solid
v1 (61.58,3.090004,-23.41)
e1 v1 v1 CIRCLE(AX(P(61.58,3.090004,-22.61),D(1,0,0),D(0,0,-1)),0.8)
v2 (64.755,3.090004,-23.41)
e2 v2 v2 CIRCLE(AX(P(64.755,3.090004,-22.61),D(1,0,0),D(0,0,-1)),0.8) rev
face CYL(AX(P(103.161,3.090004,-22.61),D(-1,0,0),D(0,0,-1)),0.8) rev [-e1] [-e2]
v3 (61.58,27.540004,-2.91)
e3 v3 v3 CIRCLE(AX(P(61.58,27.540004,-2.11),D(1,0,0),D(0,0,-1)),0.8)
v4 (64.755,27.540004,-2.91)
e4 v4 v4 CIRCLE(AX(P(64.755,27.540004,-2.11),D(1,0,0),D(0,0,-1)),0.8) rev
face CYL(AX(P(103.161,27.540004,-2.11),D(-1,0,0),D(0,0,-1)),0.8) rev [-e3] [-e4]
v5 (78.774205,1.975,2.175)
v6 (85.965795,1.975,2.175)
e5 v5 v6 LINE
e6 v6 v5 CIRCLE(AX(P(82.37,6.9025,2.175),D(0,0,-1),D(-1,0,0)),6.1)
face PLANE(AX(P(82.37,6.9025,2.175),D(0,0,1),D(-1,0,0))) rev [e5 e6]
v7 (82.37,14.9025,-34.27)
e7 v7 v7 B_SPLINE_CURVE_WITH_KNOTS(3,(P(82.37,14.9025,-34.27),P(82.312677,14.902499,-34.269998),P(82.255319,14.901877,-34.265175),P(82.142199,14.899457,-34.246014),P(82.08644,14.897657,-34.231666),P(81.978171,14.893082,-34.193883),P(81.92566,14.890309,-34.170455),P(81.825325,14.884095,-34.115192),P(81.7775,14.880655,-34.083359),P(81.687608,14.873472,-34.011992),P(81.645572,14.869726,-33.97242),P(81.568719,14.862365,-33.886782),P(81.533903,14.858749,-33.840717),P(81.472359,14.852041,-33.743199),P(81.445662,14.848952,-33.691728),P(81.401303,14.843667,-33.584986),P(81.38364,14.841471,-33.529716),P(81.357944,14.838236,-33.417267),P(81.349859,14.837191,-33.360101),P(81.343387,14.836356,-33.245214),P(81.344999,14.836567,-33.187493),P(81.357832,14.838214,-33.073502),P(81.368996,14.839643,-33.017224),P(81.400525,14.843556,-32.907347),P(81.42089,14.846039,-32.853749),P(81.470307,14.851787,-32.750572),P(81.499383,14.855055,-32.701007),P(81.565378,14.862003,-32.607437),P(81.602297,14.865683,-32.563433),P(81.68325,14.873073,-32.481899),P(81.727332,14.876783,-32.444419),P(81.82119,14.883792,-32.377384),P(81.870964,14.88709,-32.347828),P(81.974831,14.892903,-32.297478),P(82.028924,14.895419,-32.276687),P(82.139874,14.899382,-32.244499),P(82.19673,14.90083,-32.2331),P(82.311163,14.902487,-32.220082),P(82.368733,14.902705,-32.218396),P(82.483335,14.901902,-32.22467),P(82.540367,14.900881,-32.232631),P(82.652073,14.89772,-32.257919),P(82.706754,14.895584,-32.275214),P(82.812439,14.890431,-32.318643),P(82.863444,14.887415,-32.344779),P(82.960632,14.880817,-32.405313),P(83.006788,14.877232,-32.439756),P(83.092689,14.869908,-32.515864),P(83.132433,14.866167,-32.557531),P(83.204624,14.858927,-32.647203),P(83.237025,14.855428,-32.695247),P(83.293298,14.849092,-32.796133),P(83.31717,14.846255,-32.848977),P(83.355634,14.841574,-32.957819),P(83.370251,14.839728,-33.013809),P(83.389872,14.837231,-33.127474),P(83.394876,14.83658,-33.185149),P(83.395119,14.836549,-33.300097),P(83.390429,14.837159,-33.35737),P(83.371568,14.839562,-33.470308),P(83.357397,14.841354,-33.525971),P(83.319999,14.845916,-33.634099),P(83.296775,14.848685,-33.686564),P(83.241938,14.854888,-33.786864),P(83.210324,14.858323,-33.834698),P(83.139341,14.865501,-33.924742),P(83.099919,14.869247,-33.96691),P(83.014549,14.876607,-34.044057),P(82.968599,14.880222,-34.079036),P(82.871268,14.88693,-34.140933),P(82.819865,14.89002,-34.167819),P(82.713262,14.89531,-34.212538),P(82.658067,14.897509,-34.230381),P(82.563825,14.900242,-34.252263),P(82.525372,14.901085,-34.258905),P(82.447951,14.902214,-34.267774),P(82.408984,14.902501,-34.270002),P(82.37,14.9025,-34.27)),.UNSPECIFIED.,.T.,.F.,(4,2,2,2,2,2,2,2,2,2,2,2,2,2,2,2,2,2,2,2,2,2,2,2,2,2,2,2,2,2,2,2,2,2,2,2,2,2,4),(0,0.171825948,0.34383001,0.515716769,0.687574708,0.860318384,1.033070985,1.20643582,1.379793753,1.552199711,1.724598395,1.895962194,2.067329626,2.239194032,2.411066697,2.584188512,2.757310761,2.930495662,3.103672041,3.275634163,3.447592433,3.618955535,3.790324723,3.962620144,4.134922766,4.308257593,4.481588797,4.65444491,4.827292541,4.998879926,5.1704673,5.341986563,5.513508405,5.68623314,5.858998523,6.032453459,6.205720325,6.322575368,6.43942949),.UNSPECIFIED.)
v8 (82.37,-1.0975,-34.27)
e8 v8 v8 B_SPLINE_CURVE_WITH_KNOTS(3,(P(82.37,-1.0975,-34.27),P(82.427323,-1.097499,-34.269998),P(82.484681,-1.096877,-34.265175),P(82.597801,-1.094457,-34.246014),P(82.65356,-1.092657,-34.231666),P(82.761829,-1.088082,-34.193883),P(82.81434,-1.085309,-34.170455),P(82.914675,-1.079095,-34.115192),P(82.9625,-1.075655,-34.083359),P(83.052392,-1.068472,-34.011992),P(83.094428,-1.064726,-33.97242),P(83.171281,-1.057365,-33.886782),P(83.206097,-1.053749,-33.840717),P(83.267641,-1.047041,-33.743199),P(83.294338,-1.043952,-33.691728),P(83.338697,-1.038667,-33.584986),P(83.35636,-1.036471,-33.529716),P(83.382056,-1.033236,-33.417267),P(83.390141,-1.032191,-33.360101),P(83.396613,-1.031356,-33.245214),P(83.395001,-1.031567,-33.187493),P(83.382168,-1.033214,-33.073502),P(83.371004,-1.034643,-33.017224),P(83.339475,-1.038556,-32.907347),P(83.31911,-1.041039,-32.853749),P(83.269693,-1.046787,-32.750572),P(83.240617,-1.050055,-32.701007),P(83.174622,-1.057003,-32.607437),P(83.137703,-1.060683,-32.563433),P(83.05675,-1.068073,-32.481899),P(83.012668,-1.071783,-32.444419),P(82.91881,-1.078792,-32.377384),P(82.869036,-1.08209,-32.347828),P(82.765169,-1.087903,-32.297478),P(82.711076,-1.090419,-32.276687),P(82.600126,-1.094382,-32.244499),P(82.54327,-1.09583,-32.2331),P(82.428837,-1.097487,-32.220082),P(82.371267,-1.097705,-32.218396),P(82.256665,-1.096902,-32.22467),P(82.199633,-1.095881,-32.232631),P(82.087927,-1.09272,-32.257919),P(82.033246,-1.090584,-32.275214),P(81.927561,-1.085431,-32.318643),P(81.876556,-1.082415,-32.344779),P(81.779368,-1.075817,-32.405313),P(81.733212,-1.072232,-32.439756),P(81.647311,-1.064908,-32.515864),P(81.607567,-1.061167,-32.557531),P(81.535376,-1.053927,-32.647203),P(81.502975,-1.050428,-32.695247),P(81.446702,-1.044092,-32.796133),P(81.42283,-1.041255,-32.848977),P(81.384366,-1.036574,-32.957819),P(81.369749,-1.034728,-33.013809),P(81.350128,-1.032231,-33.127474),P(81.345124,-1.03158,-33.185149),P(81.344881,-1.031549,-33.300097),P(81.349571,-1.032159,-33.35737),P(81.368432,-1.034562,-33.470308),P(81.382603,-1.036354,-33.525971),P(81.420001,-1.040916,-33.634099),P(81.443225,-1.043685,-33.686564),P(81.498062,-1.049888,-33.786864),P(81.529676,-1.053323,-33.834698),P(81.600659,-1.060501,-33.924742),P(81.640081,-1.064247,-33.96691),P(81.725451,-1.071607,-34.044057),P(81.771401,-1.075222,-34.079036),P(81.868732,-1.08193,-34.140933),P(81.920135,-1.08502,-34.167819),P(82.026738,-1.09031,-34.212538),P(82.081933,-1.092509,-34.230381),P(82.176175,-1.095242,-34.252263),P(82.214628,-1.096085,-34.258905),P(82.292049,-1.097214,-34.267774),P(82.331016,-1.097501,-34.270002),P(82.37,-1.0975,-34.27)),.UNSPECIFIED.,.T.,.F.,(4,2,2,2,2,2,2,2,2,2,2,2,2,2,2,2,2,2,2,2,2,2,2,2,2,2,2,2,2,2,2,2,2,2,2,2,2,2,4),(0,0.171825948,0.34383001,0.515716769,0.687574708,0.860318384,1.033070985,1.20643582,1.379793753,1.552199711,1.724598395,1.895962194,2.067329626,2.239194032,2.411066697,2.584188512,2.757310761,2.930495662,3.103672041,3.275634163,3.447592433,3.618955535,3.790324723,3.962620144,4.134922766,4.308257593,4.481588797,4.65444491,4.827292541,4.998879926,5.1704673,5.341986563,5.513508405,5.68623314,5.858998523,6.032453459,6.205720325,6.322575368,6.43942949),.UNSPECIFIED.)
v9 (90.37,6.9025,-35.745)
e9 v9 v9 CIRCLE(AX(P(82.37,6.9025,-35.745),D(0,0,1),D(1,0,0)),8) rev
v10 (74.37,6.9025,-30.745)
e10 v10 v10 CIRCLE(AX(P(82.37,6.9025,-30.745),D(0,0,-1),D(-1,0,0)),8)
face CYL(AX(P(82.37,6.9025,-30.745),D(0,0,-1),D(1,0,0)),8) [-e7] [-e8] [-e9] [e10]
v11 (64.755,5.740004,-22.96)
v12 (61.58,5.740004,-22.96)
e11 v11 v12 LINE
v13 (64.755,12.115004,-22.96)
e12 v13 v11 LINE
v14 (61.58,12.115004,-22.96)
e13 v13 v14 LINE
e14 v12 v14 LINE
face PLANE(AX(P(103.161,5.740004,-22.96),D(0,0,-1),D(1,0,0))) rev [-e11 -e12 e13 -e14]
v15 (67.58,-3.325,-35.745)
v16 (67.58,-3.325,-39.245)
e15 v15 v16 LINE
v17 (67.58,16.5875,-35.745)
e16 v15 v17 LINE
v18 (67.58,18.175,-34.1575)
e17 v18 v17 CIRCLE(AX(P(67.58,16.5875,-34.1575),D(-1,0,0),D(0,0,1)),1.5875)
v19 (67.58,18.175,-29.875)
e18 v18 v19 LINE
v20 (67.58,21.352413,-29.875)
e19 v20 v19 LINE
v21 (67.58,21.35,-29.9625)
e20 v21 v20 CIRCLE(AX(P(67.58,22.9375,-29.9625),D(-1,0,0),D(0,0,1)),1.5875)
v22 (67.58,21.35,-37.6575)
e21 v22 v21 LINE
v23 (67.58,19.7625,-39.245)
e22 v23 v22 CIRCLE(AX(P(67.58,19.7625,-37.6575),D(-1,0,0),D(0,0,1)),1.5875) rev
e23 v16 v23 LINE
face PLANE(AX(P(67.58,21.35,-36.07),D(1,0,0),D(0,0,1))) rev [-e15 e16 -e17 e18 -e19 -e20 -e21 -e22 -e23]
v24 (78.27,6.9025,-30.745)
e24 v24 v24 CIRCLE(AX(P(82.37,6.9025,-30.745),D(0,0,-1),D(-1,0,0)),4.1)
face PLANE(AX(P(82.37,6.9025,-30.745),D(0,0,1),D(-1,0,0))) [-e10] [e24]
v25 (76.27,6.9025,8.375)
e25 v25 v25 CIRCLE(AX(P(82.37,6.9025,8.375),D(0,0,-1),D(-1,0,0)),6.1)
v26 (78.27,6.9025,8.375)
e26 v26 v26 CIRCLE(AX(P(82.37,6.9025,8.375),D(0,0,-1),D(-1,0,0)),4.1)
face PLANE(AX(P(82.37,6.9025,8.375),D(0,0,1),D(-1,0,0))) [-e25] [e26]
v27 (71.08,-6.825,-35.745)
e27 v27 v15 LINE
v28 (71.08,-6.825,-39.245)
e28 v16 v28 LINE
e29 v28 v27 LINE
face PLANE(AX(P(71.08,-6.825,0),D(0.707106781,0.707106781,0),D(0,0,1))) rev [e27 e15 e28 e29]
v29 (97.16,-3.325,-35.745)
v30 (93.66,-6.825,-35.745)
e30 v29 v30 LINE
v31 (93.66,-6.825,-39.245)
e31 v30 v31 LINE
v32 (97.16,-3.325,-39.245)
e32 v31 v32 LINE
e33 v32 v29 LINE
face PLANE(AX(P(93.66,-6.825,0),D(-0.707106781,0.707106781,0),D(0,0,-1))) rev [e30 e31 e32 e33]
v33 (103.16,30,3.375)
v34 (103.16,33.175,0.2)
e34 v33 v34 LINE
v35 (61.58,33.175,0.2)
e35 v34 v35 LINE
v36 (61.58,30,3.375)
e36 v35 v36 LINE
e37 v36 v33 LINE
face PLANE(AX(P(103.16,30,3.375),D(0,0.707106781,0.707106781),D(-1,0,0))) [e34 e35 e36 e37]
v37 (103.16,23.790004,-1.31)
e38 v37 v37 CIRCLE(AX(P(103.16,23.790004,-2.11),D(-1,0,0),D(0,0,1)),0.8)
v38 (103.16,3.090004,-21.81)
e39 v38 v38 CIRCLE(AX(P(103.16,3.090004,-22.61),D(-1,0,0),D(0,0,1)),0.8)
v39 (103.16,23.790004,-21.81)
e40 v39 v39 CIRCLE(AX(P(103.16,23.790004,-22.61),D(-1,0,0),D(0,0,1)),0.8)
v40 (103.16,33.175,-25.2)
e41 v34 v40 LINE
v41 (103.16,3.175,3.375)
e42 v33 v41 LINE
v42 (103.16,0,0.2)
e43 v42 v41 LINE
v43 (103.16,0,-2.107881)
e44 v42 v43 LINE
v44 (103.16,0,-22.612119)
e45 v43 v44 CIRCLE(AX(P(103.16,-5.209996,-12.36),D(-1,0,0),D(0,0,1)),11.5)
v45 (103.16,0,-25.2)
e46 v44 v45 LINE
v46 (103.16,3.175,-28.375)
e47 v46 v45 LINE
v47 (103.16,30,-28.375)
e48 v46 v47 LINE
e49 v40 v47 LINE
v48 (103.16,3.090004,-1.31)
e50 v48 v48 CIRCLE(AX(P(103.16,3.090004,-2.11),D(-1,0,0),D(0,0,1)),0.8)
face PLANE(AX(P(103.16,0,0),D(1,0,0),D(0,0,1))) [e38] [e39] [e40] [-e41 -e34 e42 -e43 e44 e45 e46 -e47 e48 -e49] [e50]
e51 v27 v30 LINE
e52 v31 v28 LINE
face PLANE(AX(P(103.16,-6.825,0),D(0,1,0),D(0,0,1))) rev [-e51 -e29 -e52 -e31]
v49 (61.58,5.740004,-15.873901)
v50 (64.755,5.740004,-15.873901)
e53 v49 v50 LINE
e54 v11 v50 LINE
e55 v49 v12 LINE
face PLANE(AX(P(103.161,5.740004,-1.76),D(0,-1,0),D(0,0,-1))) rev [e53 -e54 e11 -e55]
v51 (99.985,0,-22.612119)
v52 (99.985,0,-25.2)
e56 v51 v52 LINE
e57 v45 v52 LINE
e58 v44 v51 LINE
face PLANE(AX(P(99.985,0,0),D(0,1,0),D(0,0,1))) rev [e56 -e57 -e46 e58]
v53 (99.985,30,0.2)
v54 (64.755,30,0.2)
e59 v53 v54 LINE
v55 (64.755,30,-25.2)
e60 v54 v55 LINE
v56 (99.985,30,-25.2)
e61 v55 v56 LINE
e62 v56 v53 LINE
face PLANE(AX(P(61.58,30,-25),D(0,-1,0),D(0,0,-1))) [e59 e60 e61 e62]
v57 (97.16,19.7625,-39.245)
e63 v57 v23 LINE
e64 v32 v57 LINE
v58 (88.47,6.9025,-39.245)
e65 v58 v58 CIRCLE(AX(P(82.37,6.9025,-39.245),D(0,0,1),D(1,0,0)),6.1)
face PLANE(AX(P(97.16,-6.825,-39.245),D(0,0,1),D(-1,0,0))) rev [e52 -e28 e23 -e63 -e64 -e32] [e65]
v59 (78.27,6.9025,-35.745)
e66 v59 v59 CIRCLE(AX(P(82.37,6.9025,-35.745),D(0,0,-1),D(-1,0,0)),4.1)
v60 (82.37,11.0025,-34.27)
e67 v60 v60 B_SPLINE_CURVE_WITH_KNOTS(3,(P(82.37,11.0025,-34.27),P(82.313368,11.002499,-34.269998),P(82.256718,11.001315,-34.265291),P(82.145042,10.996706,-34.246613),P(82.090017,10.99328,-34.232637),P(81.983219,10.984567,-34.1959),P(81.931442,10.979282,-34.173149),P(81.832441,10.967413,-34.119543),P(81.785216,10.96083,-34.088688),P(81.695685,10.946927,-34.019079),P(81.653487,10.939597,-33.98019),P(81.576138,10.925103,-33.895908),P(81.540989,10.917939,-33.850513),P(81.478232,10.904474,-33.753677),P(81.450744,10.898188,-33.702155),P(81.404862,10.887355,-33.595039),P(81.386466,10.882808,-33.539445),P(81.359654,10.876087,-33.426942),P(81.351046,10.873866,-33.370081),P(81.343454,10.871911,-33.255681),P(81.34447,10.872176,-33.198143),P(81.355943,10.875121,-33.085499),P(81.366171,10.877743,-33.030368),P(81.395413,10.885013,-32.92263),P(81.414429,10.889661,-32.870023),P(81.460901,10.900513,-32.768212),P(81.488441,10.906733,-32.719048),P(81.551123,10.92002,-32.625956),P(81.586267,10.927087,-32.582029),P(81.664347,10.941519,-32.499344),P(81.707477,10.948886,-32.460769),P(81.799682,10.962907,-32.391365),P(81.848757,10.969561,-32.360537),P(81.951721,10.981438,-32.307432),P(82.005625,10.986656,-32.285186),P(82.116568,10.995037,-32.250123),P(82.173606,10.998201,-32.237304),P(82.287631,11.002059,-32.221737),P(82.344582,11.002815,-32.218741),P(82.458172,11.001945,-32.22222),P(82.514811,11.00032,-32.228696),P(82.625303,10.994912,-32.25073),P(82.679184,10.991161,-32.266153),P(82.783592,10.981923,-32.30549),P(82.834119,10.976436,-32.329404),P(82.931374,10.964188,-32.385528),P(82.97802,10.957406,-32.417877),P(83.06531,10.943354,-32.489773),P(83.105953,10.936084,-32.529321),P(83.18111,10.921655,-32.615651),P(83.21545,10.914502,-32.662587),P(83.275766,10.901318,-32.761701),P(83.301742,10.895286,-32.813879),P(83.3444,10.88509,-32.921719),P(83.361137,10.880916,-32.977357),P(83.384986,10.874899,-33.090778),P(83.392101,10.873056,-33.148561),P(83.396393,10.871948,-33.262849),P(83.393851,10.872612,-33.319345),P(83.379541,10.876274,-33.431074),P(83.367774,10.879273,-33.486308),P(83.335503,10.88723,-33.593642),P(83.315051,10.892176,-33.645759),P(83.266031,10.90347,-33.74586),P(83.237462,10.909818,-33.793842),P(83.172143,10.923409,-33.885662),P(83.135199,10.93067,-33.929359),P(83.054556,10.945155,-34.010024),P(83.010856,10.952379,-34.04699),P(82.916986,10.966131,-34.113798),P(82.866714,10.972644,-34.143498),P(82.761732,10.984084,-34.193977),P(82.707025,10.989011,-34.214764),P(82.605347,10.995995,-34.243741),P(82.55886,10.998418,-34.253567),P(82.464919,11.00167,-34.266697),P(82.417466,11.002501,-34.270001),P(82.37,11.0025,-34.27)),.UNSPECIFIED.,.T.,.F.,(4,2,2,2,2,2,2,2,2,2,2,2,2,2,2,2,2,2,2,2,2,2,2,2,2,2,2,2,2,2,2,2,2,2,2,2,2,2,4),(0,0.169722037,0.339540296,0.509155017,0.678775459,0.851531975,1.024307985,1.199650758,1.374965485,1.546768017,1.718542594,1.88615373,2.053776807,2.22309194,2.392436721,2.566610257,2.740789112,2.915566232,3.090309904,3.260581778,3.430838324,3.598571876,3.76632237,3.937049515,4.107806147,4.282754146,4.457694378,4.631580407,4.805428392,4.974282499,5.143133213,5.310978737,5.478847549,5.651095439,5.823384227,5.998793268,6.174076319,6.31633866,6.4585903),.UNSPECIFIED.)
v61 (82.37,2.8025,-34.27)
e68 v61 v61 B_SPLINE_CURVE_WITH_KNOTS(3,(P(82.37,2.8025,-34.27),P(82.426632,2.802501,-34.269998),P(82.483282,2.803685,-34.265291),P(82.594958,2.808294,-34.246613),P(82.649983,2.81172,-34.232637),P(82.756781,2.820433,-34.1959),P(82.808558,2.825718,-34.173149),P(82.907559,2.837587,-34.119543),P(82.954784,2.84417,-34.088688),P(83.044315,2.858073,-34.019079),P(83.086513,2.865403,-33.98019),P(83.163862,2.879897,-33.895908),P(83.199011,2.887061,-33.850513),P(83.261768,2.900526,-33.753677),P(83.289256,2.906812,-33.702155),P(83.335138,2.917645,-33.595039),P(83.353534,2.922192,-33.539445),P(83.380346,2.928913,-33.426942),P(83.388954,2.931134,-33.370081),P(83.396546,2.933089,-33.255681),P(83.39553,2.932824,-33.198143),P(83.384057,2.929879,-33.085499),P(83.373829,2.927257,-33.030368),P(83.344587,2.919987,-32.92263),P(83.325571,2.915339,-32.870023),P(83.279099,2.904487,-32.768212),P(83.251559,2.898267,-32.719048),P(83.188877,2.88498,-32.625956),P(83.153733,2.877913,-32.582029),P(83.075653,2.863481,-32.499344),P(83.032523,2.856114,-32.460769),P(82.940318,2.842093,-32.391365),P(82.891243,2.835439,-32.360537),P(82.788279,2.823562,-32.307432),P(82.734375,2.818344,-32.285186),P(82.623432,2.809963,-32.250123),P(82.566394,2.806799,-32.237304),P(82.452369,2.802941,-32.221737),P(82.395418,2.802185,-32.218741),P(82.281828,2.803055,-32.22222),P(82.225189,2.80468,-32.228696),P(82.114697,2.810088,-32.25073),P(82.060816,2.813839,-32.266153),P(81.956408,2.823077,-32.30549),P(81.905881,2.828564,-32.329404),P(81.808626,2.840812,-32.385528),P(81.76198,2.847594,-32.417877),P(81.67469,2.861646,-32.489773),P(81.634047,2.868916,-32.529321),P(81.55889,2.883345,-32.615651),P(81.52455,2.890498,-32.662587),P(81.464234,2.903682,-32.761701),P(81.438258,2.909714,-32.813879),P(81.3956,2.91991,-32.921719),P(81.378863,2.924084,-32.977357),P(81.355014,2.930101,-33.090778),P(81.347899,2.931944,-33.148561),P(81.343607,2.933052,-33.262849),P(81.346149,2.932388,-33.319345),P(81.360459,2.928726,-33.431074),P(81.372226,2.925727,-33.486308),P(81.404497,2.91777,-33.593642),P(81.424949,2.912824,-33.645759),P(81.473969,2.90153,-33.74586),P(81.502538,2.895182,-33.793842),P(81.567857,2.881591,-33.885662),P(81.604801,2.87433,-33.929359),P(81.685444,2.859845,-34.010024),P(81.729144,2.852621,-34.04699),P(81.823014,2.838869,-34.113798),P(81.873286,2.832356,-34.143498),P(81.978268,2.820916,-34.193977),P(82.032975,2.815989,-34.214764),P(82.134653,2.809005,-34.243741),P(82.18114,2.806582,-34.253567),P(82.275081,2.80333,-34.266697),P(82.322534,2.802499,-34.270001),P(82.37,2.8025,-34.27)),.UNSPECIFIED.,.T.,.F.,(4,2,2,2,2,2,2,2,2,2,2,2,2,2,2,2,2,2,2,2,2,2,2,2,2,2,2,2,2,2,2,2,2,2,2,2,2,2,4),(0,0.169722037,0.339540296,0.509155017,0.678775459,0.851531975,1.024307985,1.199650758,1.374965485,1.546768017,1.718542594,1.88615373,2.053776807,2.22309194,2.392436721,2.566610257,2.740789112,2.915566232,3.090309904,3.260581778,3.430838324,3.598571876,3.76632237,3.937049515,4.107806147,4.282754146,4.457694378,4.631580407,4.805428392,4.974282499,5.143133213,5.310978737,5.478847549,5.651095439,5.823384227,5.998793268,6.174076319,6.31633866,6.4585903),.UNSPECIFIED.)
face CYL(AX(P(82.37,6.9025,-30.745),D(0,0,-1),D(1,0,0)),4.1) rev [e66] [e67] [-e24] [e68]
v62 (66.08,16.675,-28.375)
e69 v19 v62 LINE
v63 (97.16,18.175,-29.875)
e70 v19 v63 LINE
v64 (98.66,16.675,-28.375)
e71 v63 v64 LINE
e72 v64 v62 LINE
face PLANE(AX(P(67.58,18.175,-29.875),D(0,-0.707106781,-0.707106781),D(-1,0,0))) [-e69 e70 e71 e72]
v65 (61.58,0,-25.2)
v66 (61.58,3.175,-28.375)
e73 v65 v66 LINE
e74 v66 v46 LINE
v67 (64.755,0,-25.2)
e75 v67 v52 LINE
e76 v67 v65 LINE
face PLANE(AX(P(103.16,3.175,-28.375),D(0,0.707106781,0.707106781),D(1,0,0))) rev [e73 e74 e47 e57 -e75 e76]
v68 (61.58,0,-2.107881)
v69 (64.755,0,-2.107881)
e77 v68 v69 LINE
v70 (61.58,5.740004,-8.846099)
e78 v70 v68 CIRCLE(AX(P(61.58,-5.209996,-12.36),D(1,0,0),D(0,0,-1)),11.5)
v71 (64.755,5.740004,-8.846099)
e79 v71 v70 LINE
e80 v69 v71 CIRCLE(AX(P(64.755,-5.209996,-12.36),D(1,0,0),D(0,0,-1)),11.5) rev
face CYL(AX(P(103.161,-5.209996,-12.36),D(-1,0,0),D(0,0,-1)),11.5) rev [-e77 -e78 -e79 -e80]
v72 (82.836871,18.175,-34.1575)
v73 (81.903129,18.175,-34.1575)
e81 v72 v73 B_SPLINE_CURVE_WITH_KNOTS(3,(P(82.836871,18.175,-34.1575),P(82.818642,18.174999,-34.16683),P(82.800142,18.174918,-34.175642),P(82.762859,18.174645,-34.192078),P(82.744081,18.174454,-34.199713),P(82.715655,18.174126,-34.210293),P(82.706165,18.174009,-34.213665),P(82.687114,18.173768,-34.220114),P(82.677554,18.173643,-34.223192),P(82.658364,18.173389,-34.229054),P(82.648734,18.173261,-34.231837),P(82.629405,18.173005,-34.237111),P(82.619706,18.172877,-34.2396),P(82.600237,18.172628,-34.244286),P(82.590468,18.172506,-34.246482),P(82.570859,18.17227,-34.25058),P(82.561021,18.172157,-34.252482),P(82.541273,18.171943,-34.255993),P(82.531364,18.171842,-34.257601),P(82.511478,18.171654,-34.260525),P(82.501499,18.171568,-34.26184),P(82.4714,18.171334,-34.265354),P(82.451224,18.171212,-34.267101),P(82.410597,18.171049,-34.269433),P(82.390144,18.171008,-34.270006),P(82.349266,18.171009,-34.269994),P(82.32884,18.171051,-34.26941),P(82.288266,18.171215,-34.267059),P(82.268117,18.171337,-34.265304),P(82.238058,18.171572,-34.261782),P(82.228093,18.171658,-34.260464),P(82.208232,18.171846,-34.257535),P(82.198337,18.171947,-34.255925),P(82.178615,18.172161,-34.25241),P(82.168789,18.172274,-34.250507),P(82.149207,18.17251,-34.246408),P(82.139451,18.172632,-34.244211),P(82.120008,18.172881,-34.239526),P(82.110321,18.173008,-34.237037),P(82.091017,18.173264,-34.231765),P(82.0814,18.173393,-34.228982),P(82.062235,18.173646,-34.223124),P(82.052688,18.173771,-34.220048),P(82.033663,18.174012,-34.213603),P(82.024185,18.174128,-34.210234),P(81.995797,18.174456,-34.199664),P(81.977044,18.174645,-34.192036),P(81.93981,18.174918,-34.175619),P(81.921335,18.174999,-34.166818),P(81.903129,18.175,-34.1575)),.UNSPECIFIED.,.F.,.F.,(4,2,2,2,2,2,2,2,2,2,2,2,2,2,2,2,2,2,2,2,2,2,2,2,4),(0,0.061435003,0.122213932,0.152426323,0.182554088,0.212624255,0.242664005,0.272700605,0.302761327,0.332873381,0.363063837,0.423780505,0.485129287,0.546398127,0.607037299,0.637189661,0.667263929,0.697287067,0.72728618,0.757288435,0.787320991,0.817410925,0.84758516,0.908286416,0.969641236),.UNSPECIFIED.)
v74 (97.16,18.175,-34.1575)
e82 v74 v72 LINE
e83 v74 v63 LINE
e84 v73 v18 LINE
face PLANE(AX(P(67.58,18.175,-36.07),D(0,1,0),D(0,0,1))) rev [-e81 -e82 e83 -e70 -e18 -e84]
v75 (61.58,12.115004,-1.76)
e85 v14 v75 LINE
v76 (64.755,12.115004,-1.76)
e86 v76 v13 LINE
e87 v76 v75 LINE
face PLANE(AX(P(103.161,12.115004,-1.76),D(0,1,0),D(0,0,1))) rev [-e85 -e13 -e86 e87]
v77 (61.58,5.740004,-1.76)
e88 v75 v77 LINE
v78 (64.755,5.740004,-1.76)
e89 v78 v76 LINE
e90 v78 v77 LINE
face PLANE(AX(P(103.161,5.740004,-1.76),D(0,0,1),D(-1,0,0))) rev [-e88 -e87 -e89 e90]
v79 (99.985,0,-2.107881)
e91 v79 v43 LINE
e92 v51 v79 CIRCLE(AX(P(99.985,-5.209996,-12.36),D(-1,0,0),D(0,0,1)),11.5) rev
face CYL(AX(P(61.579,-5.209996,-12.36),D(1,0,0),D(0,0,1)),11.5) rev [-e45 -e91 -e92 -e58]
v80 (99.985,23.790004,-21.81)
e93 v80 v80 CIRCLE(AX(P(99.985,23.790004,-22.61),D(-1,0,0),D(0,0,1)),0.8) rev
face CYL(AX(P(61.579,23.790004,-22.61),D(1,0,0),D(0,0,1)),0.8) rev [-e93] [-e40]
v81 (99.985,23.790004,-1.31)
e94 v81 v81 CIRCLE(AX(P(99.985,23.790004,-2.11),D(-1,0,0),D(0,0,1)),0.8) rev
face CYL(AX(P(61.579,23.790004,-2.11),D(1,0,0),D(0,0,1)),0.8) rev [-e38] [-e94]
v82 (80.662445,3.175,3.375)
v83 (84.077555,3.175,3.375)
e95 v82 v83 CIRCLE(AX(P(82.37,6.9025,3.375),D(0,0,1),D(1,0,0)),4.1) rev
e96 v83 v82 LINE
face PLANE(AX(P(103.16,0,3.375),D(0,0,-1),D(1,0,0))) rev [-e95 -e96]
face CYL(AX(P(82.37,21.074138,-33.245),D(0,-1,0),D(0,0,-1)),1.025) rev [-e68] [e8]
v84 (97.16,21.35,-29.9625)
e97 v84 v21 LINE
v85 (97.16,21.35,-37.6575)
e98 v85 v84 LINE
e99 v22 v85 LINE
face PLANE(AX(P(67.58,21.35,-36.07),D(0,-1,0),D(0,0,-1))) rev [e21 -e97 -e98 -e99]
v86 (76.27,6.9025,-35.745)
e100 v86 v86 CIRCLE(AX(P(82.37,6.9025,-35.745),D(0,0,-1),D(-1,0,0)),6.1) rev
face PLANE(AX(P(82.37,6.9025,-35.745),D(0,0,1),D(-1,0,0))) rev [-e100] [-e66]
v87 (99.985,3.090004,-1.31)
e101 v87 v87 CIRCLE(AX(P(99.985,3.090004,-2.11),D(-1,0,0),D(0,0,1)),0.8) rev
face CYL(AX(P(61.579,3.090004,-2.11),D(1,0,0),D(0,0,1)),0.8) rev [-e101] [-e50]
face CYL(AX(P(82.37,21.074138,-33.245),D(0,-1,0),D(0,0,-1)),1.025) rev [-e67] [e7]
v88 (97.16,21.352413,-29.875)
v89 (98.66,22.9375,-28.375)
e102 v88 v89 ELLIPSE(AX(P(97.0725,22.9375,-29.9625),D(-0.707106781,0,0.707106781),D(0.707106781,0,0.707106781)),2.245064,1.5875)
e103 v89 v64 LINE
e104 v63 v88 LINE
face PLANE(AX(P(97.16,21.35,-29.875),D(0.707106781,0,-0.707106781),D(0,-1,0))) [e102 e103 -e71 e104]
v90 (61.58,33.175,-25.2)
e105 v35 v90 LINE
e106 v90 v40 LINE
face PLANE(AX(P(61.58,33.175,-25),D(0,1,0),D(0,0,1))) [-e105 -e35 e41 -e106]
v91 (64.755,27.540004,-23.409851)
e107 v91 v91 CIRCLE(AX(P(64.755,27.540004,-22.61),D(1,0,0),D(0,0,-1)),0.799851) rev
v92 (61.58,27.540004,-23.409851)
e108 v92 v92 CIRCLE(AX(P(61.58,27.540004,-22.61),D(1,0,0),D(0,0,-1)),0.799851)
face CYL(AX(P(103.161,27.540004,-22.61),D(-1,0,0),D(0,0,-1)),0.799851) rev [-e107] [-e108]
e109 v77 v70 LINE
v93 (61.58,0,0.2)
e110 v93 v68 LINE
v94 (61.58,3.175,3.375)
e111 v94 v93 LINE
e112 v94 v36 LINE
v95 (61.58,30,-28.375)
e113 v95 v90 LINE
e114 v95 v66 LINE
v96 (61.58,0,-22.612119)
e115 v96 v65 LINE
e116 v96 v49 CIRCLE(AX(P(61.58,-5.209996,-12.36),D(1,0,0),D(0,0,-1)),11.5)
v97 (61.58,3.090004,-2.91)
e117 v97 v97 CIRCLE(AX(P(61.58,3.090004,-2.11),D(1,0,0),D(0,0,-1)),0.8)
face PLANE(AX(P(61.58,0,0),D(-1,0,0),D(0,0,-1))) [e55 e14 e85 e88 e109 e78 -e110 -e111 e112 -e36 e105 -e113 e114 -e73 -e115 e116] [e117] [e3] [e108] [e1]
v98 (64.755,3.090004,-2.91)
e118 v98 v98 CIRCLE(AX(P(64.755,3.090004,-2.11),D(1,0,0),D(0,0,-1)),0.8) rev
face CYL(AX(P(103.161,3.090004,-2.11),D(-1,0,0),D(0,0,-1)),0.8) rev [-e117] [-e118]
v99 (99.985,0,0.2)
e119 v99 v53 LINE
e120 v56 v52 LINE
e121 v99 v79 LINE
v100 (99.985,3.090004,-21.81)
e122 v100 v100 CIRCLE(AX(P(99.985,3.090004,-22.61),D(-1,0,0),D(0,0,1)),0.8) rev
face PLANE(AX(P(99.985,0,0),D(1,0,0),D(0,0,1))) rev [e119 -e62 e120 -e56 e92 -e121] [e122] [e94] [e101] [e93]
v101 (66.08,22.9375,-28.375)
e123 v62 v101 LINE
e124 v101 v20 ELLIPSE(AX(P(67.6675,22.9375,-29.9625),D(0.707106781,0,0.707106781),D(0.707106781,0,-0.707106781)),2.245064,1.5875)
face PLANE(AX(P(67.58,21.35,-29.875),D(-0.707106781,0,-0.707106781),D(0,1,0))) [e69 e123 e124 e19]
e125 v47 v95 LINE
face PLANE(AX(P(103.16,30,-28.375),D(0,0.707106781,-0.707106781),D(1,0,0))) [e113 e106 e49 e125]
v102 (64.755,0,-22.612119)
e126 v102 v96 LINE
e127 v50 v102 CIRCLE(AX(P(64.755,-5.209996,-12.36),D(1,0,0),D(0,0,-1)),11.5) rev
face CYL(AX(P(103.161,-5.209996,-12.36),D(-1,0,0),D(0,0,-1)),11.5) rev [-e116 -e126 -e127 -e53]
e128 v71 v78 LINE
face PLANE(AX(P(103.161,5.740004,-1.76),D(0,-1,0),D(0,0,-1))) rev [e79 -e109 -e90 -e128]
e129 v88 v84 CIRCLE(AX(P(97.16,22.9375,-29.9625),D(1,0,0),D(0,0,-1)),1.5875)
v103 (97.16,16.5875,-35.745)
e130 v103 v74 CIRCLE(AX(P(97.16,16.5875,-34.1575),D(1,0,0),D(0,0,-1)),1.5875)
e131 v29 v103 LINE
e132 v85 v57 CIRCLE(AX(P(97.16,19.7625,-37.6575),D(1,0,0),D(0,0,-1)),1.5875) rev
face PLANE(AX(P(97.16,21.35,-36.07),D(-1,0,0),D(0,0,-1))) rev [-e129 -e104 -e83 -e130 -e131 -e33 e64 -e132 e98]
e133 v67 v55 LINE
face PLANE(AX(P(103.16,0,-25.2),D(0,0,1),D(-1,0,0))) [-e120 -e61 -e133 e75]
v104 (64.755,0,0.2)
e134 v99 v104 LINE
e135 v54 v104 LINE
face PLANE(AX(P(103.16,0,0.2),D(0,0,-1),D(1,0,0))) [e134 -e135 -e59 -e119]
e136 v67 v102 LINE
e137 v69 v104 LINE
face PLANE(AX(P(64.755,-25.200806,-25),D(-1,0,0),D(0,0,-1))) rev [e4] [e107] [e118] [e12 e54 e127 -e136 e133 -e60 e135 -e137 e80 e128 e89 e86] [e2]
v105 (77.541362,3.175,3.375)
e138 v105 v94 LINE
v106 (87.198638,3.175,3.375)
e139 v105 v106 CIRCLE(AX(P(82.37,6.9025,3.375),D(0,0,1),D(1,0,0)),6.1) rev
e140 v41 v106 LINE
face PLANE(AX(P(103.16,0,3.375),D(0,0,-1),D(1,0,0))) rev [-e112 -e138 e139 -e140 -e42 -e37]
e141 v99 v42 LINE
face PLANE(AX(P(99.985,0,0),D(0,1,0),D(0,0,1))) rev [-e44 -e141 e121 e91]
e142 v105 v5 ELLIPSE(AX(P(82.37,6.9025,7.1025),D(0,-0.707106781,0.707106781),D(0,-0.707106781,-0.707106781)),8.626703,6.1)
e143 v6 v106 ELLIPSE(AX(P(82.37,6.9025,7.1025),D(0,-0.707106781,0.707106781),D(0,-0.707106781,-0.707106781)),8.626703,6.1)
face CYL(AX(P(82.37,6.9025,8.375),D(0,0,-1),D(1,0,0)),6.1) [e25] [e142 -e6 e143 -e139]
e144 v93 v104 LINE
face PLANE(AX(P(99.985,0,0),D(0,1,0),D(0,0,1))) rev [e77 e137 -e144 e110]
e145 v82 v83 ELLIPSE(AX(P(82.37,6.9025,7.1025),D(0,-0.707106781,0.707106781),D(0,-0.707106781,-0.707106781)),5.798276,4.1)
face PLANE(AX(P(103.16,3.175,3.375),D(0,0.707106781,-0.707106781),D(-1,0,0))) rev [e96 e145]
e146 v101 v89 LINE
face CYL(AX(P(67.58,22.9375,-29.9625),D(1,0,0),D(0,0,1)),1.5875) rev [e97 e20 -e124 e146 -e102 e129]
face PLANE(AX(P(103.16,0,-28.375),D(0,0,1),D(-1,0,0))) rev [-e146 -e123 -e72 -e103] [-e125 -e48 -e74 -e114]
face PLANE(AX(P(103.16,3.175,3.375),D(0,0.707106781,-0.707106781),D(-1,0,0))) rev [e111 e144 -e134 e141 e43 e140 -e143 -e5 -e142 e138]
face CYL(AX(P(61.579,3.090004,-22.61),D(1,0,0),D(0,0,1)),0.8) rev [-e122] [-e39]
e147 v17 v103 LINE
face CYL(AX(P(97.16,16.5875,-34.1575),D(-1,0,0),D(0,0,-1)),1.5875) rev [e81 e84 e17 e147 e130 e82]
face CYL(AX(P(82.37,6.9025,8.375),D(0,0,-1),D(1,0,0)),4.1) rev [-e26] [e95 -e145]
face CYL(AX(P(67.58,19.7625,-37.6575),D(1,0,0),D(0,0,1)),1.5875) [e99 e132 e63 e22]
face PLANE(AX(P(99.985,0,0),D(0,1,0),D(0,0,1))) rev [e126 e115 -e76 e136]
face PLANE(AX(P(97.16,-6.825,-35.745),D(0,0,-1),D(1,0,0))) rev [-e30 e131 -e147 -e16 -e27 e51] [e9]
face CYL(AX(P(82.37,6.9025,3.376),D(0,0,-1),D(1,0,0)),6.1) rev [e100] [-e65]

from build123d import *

# Parameters (mm, degrees)
SKETCH1_W                       = 25
SKETCH1_H                       = 30
BOSS_EXTRUDE1_DEPTH             = 3.175
SKETCH2_W                       = 25
SKETCH2_H                       = 3.175
BOSS_EXTRUDE2_DEPTH             = 41.58
SKETCH3_W                       = 3.175
SKETCH3_H                       = 25
BOSS_EXTRUDE3_DEPTH             = 30
CUT_EXTRUDE1_REACH              = 60.775
SKETCH4_R                       = 11.5
CUT_EXTRUDE2_REACH              = 60.775
SKETCH5_R                       = 0.8
CUT_EXTRUDE3_REACH              = 60.775
SKETCH6_R                       = 0.8
SKETCH6_R_2                     = 0.799851166
SKETCH6_W                       = 21.2
SKETCH6_H                       = 6.375
CUT_EXTRUDE4_REACH              = 60.775
SKETCH7_R                       = 11.5
BOSS_EXTRUDE4_DEPTH             = 0.2
SKETCH9_W                       = 41.58
SKETCH9_H                       = 33.175
BOSS_EXTRUDE5_DEPTH             = 3.175
BOSS_EXTRUDE6_DEPTH             = 0.2
SKETCH11_W                      = 41.58
SKETCH11_H                      = 33.175
BOSS_EXTRUDE7_DEPTH             = 3.175
CHAMFER1_SIZE                   = 3.175
CHAMFER2_SIZE                   = 3.175
SKETCH13_W                      = 29.58
SKETCH13_H                      = 3.175
BOSS_EXTRUDE8_DEPTH             = 7.695
BOSS_EXTRUDE9_REACH             = 59.968
SKETCH14_W                      = 29.58
SKETCH14_H                      = 3.5
BOSS_EXTRUDE9_DIRECTION_2_DEPTH = 25
CHAMFER3_SIZE                   = 3.5
FILLET1_R                       = 1.5875
FILLET2_R                       = 1.5875
CUT_EXTRUDE5_REACH              = 70.161
SKETCH16_R                      = 6.1
SKETCH20_R                      = 8
SKETCH20_R_2                    = 4.1
BOSS_EXTRUDE11_DEPTH            = 5
CUT_EXTRUDE6_START              = -21.7275
SKETCH21_R                      = 1.025
CUT_EXTRUDE6_DEPTH              = 16
BOSS_EXTRUDE12_DEPTH            = 5
BOSS_EXTRUDE12_DEPTH_BACK       = 1.2
SKETCH23_R                      = 6.1
SKETCH23_R_2                    = 4.1
CHAMFER4_SIZE                   = 1.5


with BuildPart() as part:
    # Sketch1 → Boss-Extrude1 (new body)
    with BuildSketch(Plane(origin=(0, 0, 0), x_dir=(0, 0, -1), z_dir=(1, 0, 0))):
        with Locations((12.5, 15)):
            Rectangle(SKETCH1_W, SKETCH1_H)
    extrude(amount=BOSS_EXTRUDE1_DEPTH)

    # Sketch2 → Boss-Extrude2 (add)
    with BuildSketch(Plane.ZY):
        with Locations((-12.5, 31.5875)):
            Rectangle(SKETCH2_W, SKETCH2_H)
    extrude(amount=-BOSS_EXTRUDE2_DEPTH)

    # Sketch3 → Boss-Extrude3 (add)
    with BuildSketch(Plane.XZ.offset(-30)):
        with Locations((39.9925, -12.5)):
            Rectangle(SKETCH3_W, SKETCH3_H)
    extrude(amount=BOSS_EXTRUDE3_DEPTH)

    # Sketch4 → Cut-Extrude1 (cut, up to next)
    with BuildSketch(Plane.ZY, mode=Mode.PRIVATE) as cut_extrude1_sk1:
        with Locations((-12.359999929, -5.209996254)):
            Circle(SKETCH4_R)
    cut_extrude1_tool1 = extrude(cut_extrude1_sk1.sketch, amount=-CUT_EXTRUDE1_REACH, mode=Mode.PRIVATE) & part.part
    add(cut_extrude1_tool1.solids().sort_by_distance((0, -5.209996, -12.36))[0], mode=Mode.SUBTRACT)

    # Sketch5 → Cut-Extrude2 (cut, up to next)
    with BuildSketch(Plane.ZY, mode=Mode.PRIVATE) as cut_extrude2_sk1:
        with Locations((-22.609999929, 3.090003746)):
            Circle(SKETCH5_R)
    cut_extrude2_tool1 = extrude(cut_extrude2_sk1.sketch, amount=-CUT_EXTRUDE2_REACH, mode=Mode.PRIVATE) & part.part
    # Sketch5 → Cut-Extrude2 (cut, up to next)
    with BuildSketch(Plane.ZY, mode=Mode.PRIVATE) as cut_extrude2_sk2:
        with Locations((-22.609999929, 23.790003746)):
            Circle(SKETCH5_R)
    cut_extrude2_tool2 = extrude(cut_extrude2_sk2.sketch, amount=-CUT_EXTRUDE2_REACH, mode=Mode.PRIVATE) & part.part
    # Sketch5 → Cut-Extrude2 (cut, up to next)
    with BuildSketch(Plane.ZY, mode=Mode.PRIVATE) as cut_extrude2_sk3:
        with Locations((-2.109999929, 23.790003746)):
            Circle(SKETCH5_R)
    cut_extrude2_tool3 = extrude(cut_extrude2_sk3.sketch, amount=-CUT_EXTRUDE2_REACH, mode=Mode.PRIVATE) & part.part
    # Sketch5 → Cut-Extrude2 (cut, up to next)
    with BuildSketch(Plane.ZY, mode=Mode.PRIVATE) as cut_extrude2_sk4:
        with Locations((-2.109999929, 3.090003746)):
            Circle(SKETCH5_R)
    cut_extrude2_tool4 = extrude(cut_extrude2_sk4.sketch, amount=-CUT_EXTRUDE2_REACH, mode=Mode.PRIVATE) & part.part
    add(cut_extrude2_tool1.solids().sort_by_distance((0, 3.090004, -22.61))[0], mode=Mode.SUBTRACT)
    add(cut_extrude2_tool2.solids().sort_by_distance((0, 23.790004, -22.61))[0], mode=Mode.SUBTRACT)
    add(cut_extrude2_tool3.solids().sort_by_distance((0, 23.790004, -2.11))[0], mode=Mode.SUBTRACT)
    add(cut_extrude2_tool4.solids().sort_by_distance((0, 3.090004, -2.11))[0], mode=Mode.SUBTRACT)

    # Sketch6 → Cut-Extrude3 (cut, up to next)
    with BuildSketch(Plane(origin=(41.58, 0, 0), x_dir=(0, 0, -1), z_dir=(1, 0, 0)), mode=Mode.PRIVATE) as cut_extrude3_sk1:
        with Locations(Location((2.109999929, 3.090003746, 0), (0, 0, 180))):
            Circle(SKETCH6_R)
    cut_extrude3_tool1 = extrude(cut_extrude3_sk1.sketch, amount=-CUT_EXTRUDE3_REACH, mode=Mode.PRIVATE) & part.part
    # Sketch6 → Cut-Extrude3 (cut, up to next)
    with BuildSketch(Plane(origin=(41.58, 0, 0), x_dir=(0, 0, -1), z_dir=(1, 0, 0)), mode=Mode.PRIVATE) as cut_extrude3_sk2:
        with Locations(Location((22.609999929, 3.090003746, 0), (0, 0, 180))):
            Circle(SKETCH6_R)
    cut_extrude3_tool2 = extrude(cut_extrude3_sk2.sketch, amount=-CUT_EXTRUDE3_REACH, mode=Mode.PRIVATE) & part.part
    # Sketch6 → Cut-Extrude3 (cut, up to next)
    with BuildSketch(Plane(origin=(41.58, 0, 0), x_dir=(0, 0, -1), z_dir=(1, 0, 0)), mode=Mode.PRIVATE) as cut_extrude3_sk3:
        with Locations((22.609999929, 27.540003746)):
            Circle(SKETCH6_R_2)
    cut_extrude3_tool3 = extrude(cut_extrude3_sk3.sketch, amount=-CUT_EXTRUDE3_REACH, mode=Mode.PRIVATE) & part.part
    # Sketch6 → Cut-Extrude3 (cut, up to next)
    with BuildSketch(Plane(origin=(41.58, 0, 0), x_dir=(0, 0, -1), z_dir=(1, 0, 0)), mode=Mode.PRIVATE) as cut_extrude3_sk4:
        with Locations((2.109999929, 27.540003746)):
            Circle(SKETCH6_R)
    cut_extrude3_tool4 = extrude(cut_extrude3_sk4.sketch, amount=-CUT_EXTRUDE3_REACH, mode=Mode.PRIVATE) & part.part
    # Sketch6 → Cut-Extrude3 (cut, up to next)
    with BuildSketch(Plane(origin=(41.58, 0, 0), x_dir=(0, 0, -1), z_dir=(1, 0, 0)), mode=Mode.PRIVATE) as cut_extrude3_sk5:
        with Locations((12.359999929, 8.927503746)):
            Rectangle(SKETCH6_W, SKETCH6_H)
    cut_extrude3_tool5 = extrude(cut_extrude3_sk5.sketch, amount=-CUT_EXTRUDE3_REACH, mode=Mode.PRIVATE) & part.part
    add(cut_extrude3_tool1.solids().sort_by_distance((41.58, 3.090004, -2.11))[0], mode=Mode.SUBTRACT)
    add(cut_extrude3_tool2.solids().sort_by_distance((41.58, 3.090004, -22.61))[0], mode=Mode.SUBTRACT)
    add(cut_extrude3_tool3.solids().sort_by_distance((41.58, 27.540004, -22.61))[0], mode=Mode.SUBTRACT)
    add(cut_extrude3_tool4.solids().sort_by_distance((41.58, 27.540004, -2.11))[0], mode=Mode.SUBTRACT)
    add(cut_extrude3_tool5.solids().sort_by_distance((41.58, 8.927504, -12.36))[0], mode=Mode.SUBTRACT)

    # Sketch7 → Cut-Extrude4 (cut, up to next)
    with BuildSketch(Plane(origin=(41.58, 0, 0), x_dir=(0, 0, -1), z_dir=(1, 0, 0)), mode=Mode.PRIVATE) as cut_extrude4_sk1:
        with Locations((12.359999929, -5.209996254)):
            Circle(SKETCH7_R)
    cut_extrude4_tool1 = extrude(cut_extrude4_sk1.sketch, amount=-CUT_EXTRUDE4_REACH, mode=Mode.PRIVATE) & part.part
    add(cut_extrude4_tool1.solids().sort_by_distance((41.58, -5.209996, -12.36))[0], mode=Mode.SUBTRACT)

    # Sketch8 → Boss-Extrude4 (add)
    with BuildSketch(Plane.XY):
        Polygon((0, 33.175), (0, 0), (3.175, 0), (3.175, 30), (38.405, 30), (38.405, 0), (41.58, 0), (41.58, 33.175), align=None)
    extrude(amount=BOSS_EXTRUDE4_DEPTH)

    # Sketch9 → Boss-Extrude5 (add)
    with BuildSketch(Plane.XY.offset(0.2)):
        with Locations((20.79, 16.5875)):
            Rectangle(SKETCH9_W, SKETCH9_H)
    extrude(amount=BOSS_EXTRUDE5_DEPTH)

    # Sketch10 → Boss-Extrude6 (add)
    with BuildSketch(Plane(origin=(0, 0, -25), x_dir=(-1, 0, 0), z_dir=(0, 0, -1))):
        Polygon((0, 0), (0, 33.175), (-41.58, 33.175), (-41.58, 0), (-38.405, 0), (-38.405, 30), (-3.175, 30), (-3.175, 0), align=None)
    extrude(amount=BOSS_EXTRUDE6_DEPTH)

    # Sketch11 → Boss-Extrude7 (add)
    with BuildSketch(Plane(origin=(0, 0, -25.2), x_dir=(-1, 0, 0), z_dir=(0, 0, -1))):
        with Locations((-20.79, 16.5875)):
            Rectangle(SKETCH11_W, SKETCH11_H)
    extrude(amount=BOSS_EXTRUDE7_DEPTH)

    # Chamfer1
    chamfer1_edges = [part.edges().sort_by_distance(p)[0] for p in [
        (20.79, 33.175, 3.375),
        (20.79, 33.175, -28.375),
    ]]
    chamfer(chamfer1_edges, length=CHAMFER1_SIZE)

    # Chamfer2
    chamfer2_edges = [part.edges().sort_by_distance(p)[0] for p in [
        (20.79, 0, 3.375),
        (20.79, 0, -28.375),
    ]]
    chamfer(chamfer2_edges, length=CHAMFER2_SIZE - 0.0001)  # a hair under: the kernel refuses the full size

    # Sketch13 → Boss-Extrude8 (add)
    with BuildSketch(Plane(origin=(0, 0, -28.375), x_dir=(-1, 0, 0), z_dir=(0, 0, -1))):
        with Locations((-20.79, 19.7625)):
            Rectangle(SKETCH13_W, SKETCH13_H)
    extrude(amount=BOSS_EXTRUDE8_DEPTH)

    # Boss-Extrude9: up to this face of the body (flat: up to its plane)
    boss_extrude9_end = Plane(part.part.faces().sort_by_distance((20.79, 21.35, -32.2225))[0])
    # Sketch14 → Boss-Extrude9 (add, up to the picked face)
    with BuildSketch(Plane.XZ.offset(-18.175), mode=Mode.PRIVATE) as boss_extrude9_sk1:
        with Locations((20.79, -37.495)):
            Rectangle(SKETCH14_W, SKETCH14_H)
    boss_extrude9_tool1 = split(extrude(boss_extrude9_sk1.sketch, amount=-BOSS_EXTRUDE9_REACH, mode=Mode.PRIVATE), bisect_by=boss_extrude9_end, keep=Keep.BOTH, mode=Mode.PRIVATE)
    add(boss_extrude9_tool1.solids().sort_by(Axis((20.79, 18.175, -37.495), (0, 1, 0)))[0])

    # Sketch14 → Boss-Extrude9 direction 2 (add)
    with BuildSketch(Plane.XZ.offset(-18.175)):
        with Locations((20.79, -37.495)):
            Rectangle(SKETCH14_W, SKETCH14_H)
    extrude(amount=BOSS_EXTRUDE9_DIRECTION_2_DEPTH)

    # Chamfer3
    chamfer3_edges = [part.edges().sort_by_distance(p)[0] for p in [
        (6, -6.825, -37.495),
        (35.58, -6.825, -37.495),
    ]]
    chamfer(chamfer3_edges, length=CHAMFER3_SIZE)

    # Fillet1
    fillet1_edges = [part.edges().sort_by_distance(p)[0] for p in [
        (20.79, 18.175, -35.745),
        (20.79, 21.35, -39.245),
    ]]
    fillet(fillet1_edges, radius=FILLET1_R)

    # Fillet2
    fillet2_edges = [part.edges().sort_by_distance(p)[0] for p in [
        (20.79, 21.35, -28.375),
    ]]
    fillet(fillet2_edges, radius=FILLET2_R)

    # Sketch16 → Cut-Extrude5 (cut, up to next)
    with BuildSketch(Plane(origin=(0, 0, -39.245), x_dir=(-1, 0, 0), z_dir=(0, 0, -1)), mode=Mode.PRIVATE) as cut_extrude5_sk1:
        with Locations((-20.79, 6.9025)):
            Circle(SKETCH16_R)
    cut_extrude5_tool1 = extrude(cut_extrude5_sk1.sketch, amount=-CUT_EXTRUDE5_REACH, mode=Mode.PRIVATE) & part.part
    add(cut_extrude5_tool1.solids().sort_by_distance((20.79, 6.9025, -39.245))[0], mode=Mode.SUBTRACT)

    # Sketch20 → Boss-Extrude11 (add)
    with BuildSketch(Plane.XY.offset(-35.745)):
        with Locations(Location((20.79, 6.9025, 0), (0, 0, 180))):
            Circle(SKETCH20_R)
        with Locations((20.79, 6.9025)):
            Circle(SKETCH20_R_2, mode=Mode.SUBTRACT)
    extrude(amount=BOSS_EXTRUDE11_DEPTH)

    # Sketch21 → Cut-Extrude6 (cut)
    with BuildSketch(Plane.XZ.offset(6.825).offset(CUT_EXTRUDE6_START)):
        with Locations(Location((20.79, -33.245, 0), (0, 0, 270))):
            Circle(SKETCH21_R)
    extrude(amount=CUT_EXTRUDE6_DEPTH, mode=Mode.SUBTRACT)

    # Sketch23 → Boss-Extrude12 (add, two sides: drawn at the far end of the back side and taken through both)
    with BuildSketch(Plane.XY.offset(3.375).offset(-BOSS_EXTRUDE12_DEPTH_BACK)):
        with Locations(Location((20.79, 6.9025, 0), (0, 0, 180))):
            Circle(SKETCH23_R)
        with Locations((20.79, 6.9025)):
            Circle(SKETCH23_R_2, mode=Mode.SUBTRACT)
    extrude(amount=BOSS_EXTRUDE12_DEPTH + BOSS_EXTRUDE12_DEPTH_BACK)

    # Chamfer4
    chamfer4_edges = [part.edges().sort_by_distance(p)[0] for p in [
        (35.58, 20.55625, -28.375),
        (20.79, 18.175, -28.375),
        (6, 20.55625, -28.375),
    ]]
    chamfer(chamfer4_edges, length=CHAMFER4_SIZE)


with BuildPart() as body_2:
    # Mirror1: mirrored copy
    add(part.part.mirror(Plane(origin=(51.58, 0, 0), x_dir=(0, 0, 1), z_dir=(1, 0, 0))))


solid = body_2.part
